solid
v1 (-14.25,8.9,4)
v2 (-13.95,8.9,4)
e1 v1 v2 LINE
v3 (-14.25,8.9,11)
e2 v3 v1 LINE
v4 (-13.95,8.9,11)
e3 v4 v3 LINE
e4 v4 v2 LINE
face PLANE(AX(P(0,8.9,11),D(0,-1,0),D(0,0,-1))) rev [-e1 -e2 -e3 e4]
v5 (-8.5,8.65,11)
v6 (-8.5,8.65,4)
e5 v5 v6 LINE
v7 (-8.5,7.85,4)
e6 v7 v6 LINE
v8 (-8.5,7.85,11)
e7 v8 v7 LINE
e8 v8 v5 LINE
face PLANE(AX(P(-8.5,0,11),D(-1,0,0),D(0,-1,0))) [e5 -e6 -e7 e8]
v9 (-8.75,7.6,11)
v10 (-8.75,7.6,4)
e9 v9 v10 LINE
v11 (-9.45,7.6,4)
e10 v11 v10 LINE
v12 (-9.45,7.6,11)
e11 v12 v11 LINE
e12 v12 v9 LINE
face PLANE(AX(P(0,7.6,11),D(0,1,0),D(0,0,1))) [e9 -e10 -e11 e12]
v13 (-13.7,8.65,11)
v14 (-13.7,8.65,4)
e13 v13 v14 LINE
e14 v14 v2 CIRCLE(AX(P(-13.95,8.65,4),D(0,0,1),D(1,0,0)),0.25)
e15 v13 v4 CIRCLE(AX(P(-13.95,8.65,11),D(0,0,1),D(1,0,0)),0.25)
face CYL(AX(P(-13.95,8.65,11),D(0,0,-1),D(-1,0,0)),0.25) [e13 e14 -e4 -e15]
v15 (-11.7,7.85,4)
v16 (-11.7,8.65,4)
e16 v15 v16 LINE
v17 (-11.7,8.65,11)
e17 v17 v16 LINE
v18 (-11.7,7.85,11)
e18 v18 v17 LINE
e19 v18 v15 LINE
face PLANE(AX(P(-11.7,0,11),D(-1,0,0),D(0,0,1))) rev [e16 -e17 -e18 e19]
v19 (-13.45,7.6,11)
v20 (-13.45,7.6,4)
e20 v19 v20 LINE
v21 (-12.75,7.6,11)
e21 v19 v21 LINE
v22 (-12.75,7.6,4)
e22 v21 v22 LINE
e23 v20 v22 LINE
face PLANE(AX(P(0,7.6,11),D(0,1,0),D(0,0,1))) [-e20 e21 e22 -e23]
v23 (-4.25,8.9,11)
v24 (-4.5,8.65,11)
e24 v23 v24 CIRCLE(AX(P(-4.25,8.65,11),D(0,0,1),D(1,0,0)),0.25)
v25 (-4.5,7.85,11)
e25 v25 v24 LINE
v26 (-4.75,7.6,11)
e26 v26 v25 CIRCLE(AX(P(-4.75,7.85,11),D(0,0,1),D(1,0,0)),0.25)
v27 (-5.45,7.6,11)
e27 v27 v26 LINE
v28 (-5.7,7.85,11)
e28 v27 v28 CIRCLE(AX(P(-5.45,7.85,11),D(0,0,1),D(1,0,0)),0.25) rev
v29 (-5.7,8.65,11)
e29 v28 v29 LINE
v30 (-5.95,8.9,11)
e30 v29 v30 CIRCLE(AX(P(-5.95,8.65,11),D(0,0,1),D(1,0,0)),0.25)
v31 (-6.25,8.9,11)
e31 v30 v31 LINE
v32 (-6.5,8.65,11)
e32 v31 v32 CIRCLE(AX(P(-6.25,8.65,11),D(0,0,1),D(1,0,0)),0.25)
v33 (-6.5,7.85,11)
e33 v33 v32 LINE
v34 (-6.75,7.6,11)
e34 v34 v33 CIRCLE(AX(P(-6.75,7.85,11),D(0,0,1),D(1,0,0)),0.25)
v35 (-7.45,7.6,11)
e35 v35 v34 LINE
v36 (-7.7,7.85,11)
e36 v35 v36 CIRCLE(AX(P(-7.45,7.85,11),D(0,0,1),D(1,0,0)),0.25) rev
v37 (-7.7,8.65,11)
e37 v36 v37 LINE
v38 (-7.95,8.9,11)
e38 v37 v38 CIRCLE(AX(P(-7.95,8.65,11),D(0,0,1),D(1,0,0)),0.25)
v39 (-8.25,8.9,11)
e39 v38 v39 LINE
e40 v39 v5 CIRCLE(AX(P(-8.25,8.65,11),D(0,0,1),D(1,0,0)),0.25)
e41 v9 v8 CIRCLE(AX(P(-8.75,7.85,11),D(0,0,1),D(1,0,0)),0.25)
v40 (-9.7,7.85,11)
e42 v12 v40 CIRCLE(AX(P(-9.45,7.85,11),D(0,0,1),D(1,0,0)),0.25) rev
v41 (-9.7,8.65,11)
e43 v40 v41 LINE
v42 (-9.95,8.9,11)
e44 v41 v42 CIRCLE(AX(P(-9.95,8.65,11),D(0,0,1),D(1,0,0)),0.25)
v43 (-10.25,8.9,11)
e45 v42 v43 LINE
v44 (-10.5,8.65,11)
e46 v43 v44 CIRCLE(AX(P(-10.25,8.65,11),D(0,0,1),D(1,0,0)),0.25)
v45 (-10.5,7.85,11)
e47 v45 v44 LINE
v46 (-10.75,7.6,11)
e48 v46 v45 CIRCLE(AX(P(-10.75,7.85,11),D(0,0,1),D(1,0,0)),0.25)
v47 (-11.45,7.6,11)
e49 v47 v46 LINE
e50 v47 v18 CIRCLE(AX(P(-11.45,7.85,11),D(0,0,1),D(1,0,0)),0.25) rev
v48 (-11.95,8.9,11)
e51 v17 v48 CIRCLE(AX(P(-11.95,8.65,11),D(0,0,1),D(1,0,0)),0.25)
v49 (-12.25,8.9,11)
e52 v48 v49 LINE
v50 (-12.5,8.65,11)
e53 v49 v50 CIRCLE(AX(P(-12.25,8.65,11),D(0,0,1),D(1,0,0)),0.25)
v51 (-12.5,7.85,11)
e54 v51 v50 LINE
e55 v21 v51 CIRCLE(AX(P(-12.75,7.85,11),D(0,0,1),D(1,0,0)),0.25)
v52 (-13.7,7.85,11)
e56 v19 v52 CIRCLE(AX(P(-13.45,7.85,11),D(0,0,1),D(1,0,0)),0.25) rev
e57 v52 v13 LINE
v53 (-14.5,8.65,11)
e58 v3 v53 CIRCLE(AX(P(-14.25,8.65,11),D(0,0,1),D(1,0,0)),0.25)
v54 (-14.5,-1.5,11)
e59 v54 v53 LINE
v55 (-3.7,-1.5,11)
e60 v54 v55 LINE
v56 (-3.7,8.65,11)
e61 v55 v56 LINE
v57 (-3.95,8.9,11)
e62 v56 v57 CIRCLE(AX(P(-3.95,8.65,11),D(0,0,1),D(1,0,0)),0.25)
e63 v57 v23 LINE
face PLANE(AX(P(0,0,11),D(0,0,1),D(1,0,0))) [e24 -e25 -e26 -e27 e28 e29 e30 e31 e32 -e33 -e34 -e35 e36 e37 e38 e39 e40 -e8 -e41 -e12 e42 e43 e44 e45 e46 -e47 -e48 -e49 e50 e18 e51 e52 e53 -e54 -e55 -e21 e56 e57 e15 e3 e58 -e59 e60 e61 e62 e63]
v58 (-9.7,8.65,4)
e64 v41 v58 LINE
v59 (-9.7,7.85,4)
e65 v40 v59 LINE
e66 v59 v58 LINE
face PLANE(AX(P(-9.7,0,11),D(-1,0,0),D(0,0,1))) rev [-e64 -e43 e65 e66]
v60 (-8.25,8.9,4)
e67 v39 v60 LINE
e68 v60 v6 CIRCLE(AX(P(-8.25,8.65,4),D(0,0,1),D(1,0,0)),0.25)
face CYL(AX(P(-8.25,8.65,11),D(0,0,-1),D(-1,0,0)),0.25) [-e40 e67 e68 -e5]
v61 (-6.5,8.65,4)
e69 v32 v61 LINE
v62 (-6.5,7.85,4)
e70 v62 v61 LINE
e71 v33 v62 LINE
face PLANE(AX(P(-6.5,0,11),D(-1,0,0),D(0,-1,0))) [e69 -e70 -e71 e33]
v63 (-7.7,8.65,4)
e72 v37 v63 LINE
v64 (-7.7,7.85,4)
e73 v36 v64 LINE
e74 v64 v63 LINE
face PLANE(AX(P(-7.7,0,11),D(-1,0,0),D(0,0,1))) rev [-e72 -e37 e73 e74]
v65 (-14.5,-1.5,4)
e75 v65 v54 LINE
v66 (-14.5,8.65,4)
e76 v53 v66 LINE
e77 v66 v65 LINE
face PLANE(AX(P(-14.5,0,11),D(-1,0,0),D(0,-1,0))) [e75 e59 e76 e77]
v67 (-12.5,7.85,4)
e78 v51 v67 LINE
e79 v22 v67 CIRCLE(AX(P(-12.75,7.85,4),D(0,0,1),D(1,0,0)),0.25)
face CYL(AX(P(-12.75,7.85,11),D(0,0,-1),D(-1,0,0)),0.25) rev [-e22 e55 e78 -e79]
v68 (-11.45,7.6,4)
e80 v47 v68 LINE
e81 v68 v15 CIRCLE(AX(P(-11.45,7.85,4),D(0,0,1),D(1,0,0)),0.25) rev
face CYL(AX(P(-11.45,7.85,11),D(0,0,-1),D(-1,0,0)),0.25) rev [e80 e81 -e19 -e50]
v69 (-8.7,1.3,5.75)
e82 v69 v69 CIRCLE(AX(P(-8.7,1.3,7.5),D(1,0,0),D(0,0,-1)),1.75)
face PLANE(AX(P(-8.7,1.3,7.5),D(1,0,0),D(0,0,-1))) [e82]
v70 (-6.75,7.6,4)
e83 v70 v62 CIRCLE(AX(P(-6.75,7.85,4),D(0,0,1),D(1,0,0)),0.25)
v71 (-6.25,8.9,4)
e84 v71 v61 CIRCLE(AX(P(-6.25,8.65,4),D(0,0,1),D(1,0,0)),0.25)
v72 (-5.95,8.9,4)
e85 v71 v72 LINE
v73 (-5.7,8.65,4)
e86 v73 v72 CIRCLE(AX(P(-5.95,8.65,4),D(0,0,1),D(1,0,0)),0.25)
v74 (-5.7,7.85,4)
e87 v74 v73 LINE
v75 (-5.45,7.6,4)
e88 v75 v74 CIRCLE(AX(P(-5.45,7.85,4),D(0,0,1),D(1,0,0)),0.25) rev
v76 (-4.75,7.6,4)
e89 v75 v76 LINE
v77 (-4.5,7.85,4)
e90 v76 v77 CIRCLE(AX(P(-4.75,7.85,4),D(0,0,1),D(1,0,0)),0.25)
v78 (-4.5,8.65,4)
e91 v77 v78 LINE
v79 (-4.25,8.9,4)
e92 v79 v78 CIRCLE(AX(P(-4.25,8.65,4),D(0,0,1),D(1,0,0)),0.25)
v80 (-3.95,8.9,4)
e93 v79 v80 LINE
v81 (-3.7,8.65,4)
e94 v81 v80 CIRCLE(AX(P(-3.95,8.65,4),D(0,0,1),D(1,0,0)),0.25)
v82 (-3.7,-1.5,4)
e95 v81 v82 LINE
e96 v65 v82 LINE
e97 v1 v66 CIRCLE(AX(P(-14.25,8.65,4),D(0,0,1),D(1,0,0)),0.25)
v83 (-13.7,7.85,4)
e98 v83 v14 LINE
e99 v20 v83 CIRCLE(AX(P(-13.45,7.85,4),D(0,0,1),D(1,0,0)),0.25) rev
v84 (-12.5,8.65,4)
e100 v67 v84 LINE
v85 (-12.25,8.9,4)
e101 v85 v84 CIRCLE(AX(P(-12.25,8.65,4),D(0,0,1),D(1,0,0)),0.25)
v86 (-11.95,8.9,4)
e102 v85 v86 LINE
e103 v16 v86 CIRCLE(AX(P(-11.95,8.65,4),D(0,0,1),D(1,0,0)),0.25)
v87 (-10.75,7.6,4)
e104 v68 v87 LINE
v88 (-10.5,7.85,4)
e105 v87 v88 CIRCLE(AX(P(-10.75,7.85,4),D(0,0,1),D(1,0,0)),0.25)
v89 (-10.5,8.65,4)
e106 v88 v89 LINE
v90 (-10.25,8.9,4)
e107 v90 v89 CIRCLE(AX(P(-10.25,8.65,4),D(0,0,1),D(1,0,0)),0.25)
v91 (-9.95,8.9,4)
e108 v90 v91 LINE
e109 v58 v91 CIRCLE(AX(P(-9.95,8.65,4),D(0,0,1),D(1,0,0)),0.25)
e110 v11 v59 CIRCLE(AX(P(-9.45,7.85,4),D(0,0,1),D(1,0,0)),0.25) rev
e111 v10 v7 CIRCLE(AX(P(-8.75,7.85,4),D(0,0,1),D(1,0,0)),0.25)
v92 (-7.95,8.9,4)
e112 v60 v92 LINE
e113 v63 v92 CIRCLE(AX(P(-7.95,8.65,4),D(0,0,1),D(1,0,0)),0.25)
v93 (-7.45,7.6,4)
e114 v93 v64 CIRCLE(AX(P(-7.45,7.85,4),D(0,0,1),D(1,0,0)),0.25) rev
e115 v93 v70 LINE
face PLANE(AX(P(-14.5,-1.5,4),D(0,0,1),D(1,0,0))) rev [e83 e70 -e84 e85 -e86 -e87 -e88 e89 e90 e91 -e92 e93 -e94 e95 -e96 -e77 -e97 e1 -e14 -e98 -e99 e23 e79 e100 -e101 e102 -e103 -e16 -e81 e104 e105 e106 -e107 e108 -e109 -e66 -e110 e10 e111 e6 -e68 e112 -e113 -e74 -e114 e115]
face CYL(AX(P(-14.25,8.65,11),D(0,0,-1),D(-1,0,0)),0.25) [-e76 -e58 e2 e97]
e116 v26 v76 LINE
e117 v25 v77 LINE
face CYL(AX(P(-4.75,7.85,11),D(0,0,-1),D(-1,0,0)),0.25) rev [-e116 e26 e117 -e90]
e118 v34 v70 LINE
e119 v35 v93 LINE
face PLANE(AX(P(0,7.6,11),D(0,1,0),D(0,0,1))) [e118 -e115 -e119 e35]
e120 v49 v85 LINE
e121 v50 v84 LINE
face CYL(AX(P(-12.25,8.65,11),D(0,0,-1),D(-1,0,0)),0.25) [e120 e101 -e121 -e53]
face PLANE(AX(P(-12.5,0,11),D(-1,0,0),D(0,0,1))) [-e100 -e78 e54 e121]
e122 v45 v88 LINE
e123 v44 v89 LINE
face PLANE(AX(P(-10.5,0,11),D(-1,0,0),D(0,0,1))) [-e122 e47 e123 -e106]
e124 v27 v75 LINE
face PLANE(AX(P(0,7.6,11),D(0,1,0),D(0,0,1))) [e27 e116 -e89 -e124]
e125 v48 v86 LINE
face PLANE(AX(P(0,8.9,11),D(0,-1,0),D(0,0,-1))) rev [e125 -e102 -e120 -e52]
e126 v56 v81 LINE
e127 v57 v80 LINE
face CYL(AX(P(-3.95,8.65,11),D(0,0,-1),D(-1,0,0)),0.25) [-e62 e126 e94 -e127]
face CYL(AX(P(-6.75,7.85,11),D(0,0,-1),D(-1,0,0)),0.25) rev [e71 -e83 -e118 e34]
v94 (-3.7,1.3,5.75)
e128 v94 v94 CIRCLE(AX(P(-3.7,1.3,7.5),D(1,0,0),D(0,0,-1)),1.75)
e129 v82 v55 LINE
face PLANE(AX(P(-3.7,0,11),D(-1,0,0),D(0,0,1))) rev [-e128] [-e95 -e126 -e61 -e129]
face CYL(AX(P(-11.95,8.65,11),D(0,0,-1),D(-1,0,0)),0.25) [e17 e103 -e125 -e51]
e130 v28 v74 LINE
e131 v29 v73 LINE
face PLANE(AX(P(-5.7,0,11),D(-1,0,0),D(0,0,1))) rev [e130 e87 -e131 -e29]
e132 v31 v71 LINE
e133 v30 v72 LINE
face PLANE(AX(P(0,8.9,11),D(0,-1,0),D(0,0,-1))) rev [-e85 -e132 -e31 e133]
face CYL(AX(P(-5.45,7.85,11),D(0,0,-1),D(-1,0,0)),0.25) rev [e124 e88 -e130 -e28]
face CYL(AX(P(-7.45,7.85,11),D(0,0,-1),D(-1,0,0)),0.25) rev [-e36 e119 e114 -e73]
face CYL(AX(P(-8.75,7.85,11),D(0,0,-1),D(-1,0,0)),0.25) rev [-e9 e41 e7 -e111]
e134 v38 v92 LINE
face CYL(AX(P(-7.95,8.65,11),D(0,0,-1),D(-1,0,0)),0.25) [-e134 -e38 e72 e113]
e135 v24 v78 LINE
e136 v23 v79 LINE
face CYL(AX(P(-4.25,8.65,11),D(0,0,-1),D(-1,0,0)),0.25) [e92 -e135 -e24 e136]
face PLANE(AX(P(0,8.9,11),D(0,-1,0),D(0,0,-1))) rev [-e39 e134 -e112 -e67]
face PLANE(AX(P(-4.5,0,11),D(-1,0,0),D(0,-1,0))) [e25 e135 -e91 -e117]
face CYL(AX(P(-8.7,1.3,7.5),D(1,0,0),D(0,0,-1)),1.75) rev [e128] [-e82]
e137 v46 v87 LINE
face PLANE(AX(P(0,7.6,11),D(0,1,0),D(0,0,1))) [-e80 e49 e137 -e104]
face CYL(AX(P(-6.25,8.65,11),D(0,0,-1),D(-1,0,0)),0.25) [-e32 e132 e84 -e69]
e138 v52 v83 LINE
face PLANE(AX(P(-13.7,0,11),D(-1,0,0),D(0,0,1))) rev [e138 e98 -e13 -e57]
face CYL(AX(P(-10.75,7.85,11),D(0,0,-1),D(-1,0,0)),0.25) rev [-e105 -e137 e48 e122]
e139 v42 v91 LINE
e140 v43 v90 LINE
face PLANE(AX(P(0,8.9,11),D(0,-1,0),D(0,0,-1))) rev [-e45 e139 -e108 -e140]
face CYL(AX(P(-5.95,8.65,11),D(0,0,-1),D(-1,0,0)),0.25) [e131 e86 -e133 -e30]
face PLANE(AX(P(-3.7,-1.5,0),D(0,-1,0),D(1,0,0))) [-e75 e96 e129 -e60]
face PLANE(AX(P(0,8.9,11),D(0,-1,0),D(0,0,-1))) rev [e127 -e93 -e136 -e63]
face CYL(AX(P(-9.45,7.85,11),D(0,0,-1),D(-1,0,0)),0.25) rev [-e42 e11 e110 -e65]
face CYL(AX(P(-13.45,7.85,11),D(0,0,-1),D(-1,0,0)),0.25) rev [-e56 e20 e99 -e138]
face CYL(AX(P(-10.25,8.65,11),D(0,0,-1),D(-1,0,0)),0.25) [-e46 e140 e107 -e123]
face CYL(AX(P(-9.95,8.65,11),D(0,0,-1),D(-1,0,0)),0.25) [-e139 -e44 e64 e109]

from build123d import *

# Parameters (mm, degrees)
SKETCH_1_W              = 4.5
SKETCH_1_H              = 2.5
SKETCH_1_H_2            = 2
EXTRUDE_1_DEPTH         = 4
EXTRUDE_3_DEPTH         = 26
EXTRUDE_3_DEPTH_BACK    = 26
EXTRUDE_START           = -14
EXTRUDE_4_DEPTH         = 28
EXTRUDE_START_2         = 24.3
EXTRUDE_5_DEPTH         = 1.7
EXTRUDE_START_3         = 12.3
EXTRUDE_6_DEPTH         = 1.7
SKETCH_3_R              = 2
EXTRUDE_7_DEPTH         = 7
FILLET_1_R              = 3
CUT_EXTRUDE_1_REACH     = 42.685
SKETCH_3_4_R            = 2
CUT_EXTRUDE_START       = -24.3
SKETCH_4_R              = 7.5
CUT_EXTRUDE_2_DEPTH     = 24.3
CUT_EXTRUDE_START_2     = -12.3
SKETCH_4_3_R            = 7.5
CUT_EXTRUDE_3_DEPTH     = 12.3
FILLET_2_R              = 3
SKETCH_5_W              = 4.5
SKETCH_5_H              = 1
CUT_EXTRUDE_5_DEPTH     = 52.439284598
CUT_EXTRUDE_START_3     = 18
CUT_EXTRUDE_6_OUTLINE_W = 4.5
CUT_EXTRUDE_6_OUTLINE_H = 1.8
CUT_EXTRUDE_6_DEPTH     = 18
FILLET_3_R              = 2
SKETCH_6_W              = 3
SKETCH_6_H              = 6
CUT_EXTRUDE_7_DEPTH     = 7
SKETCH_7_R              = 1.8
CUT_EXTRUDE_8_DEPTH     = 56.463952257
SKETCH_10_OUTSIDE_W     = 70.182
SKETCH_10_OUTSIDE_H     = 79.182
SKETCH_10_OUTSIDE_W_2   = 10.8
SKETCH_10_OUTSIDE_H_2   = 10.4
CUT_EXTRUDE_11_DEPTH    = 42.560197394
SKETCH_11_W             = 4
SKETCH_11_H             = 10.4
CUT_EXTRUDE_12_DEPTH    = 18.800280897
SKETCH_13_R             = 2
EXTRUDE_8_DEPTH         = 7
SKETCH_14_R             = 1.75
CUT_EXTRUDE_13_DEPTH    = 5


# Read off the part's stored shape, not the designer's step: 凸台-拉伸4, 切除-拉伸6
with BuildPart() as part:
    # 草图1 → 凸台-拉伸1 (new body)
    with BuildSketch(Plane.XY):
        Polygon((26, 30.5), (-26, 30.5), (-26, 12.5), (-26, -3), (-14, -3), (-14, -5.5), (-14, -30.5), (14, -30.5), (14, -5.5), (14, -3), (26, -3), (26, 12.5), align=None)
        with Locations((0, -24.75)):
            Rectangle(SKETCH_1_W, SKETCH_1_H, mode=Mode.SUBTRACT)
        with Locations((0, -4.25)):
            Rectangle(SKETCH_1_W, SKETCH_1_H, mode=Mode.SUBTRACT)
        with Locations((-12.25, 11.5)):
            Rectangle(SKETCH_1_W, SKETCH_1_H_2, mode=Mode.SUBTRACT)
        with Locations((12.25, 11.5)):
            Rectangle(SKETCH_1_W, SKETCH_1_H_2, mode=Mode.SUBTRACT)
    extrude(amount=EXTRUDE_1_DEPTH)

    # 草图2 → 凸台-拉伸3 (add, two sides: drawn at the far end of the back side and taken through both)
    with BuildSketch(Plane(origin=(0, 0, 0), x_dir=(0, 0, -1), z_dir=(1, 0, 0)).offset(-EXTRUDE_3_DEPTH_BACK)):
        with BuildLine():
            Line((0, 30.5), (-10, 30.5))
            ThreePointArc((-10, 30.5), (-1, 21.5), (-10, 12.5))
            Line((-10, 12.5), (0, 12.5))
            Line((0, 12.5), (0, 30.5))
        make_face()
        with BuildLine():
            Line((-10, 14), (-10, 12.5))
            ThreePointArc((-10, 12.5), (-1, 21.5), (-10, 30.5))
            Line((-10, 30.5), (-10, 29))
            ThreePointArc((-10, 29), (-2.5, 21.5), (-10, 14))
        make_face()
    extrude(amount=EXTRUDE_3_DEPTH + EXTRUDE_3_DEPTH_BACK)

    # 凸台-拉伸4 outline → 凸台-拉伸4 (add)
    with BuildSketch(Plane(origin=(0, 0, 0), x_dir=(0, 0, -1), z_dir=(1, 0, 0)).offset(EXTRUDE_START)):
        with BuildLine():
            ThreePointArc((-10, -7), (-6.645898034, -7.791796068), (-4, -10))
            Line((-4, -10), (-4, -5.5))
            Line((-4, -5.5), (-10, -5.5))
            Line((-10, -5.5), (-10, -7))
        make_face()
        with BuildLine():
            Line((-10, -23.5), (-4, -23.5))
            Line((-4, -23.5), (-4, -19))
            ThreePointArc((-4, -19), (-6.645898034, -21.208203932), (-10, -22))
            Line((-10, -22), (-10, -23.5))
        make_face()
    extrude(amount=EXTRUDE_4_DEPTH)

    # 草图2<5> → 凸台-拉伸5 (add)
    with BuildSketch(Plane(origin=(0, 0, 0), x_dir=(0, 0, -1), z_dir=(1, 0, 0)).offset(EXTRUDE_START_2)):
        with BuildLine():
            Line((-10, 16.5), (-10, 14))
            ThreePointArc((-10, 14), (-2.5, 21.5), (-10, 29))
            Line((-10, 29), (-10, 26.5))
            ThreePointArc((-10, 26.5), (-5, 21.5), (-10, 16.5))
        make_face()
    extrude_5 = extrude(amount=EXTRUDE_5_DEPTH)

    # 草图2<6> → 凸台-拉伸6 (add)
    with BuildSketch(Plane(origin=(0, 0, 0), x_dir=(0, 0, -1), z_dir=(1, 0, 0)).offset(EXTRUDE_START_3)):
        with BuildLine():
            Line((-10, -9.5), (-10, -7))
            ThreePointArc((-10, -7), (-2.5, -14.5), (-10, -22))
            Line((-10, -22), (-10, -19.5))
            ThreePointArc((-10, -19.5), (-5, -14.5), (-10, -9.5))
        make_face()
    extrude_6 = extrude(amount=EXTRUDE_6_DEPTH)

    # 镜向1: 凸台-拉伸5, 凸台-拉伸6 across plane
    add(extrude_5.mirror(Plane(origin=(0, 0, 0), x_dir=(0, 0, 1), z_dir=(1, 0, 0))))
    add(extrude_6.mirror(Plane(origin=(0, 0, 0), x_dir=(0, 0, 1), z_dir=(1, 0, 0))))

    # 草图3 → 凸台-拉伸7 (add)
    # profile 1 of 2: a face of its own
    with BuildSketch(Plane.XY.offset(4)):
        with BuildLine():
            Line((-14.5, 8.65), (-14.5, -3))
            Line((-14.5, -3), (26, -3))
            Line((26, -3), (26, 8.65))
            Line((26, 8.65), (15.5, 8.65))
            Line((15.5, 8.65), (15.5, 7.85))
            ThreePointArc((15.5, 7.85), (15.426776695, 7.673223305), (15.25, 7.6))
            Line((15.25, 7.6), (14.55, 7.6))
            ThreePointArc((14.55, 7.6), (14.373223305, 7.673223305), (14.3, 7.85))
            Line((14.3, 7.85), (14.3, 8.65))
            ThreePointArc((14.3, 8.65), (14.226776695, 8.826776695), (14.05, 8.9))
            Line((14.05, 8.9), (13.75, 8.9))
            ThreePointArc((13.75, 8.9), (13.573223305, 8.826776695), (13.5, 8.65))
            Line((13.5, 8.65), (13.5, 7.85))
            ThreePointArc((13.5, 7.85), (13.426776695, 7.673223305), (13.25, 7.6))
            Line((13.25, 7.6), (12.55, 7.6))
            ThreePointArc((12.55, 7.6), (12.373223305, 7.673223305), (12.3, 7.85))
            Line((12.3, 7.85), (12.3, 8.65))
            ThreePointArc((12.3, 8.65), (12.226776695, 8.826776695), (12.05, 8.9))
            Line((12.05, 8.9), (11.75, 8.9))
            ThreePointArc((11.75, 8.9), (11.573223305, 8.826776695), (11.5, 8.65))
            Line((11.5, 8.65), (11.5, 7.85))
            ThreePointArc((11.5, 7.85), (11.426776695, 7.673223305), (11.25, 7.6))
            Line((11.25, 7.6), (10.55, 7.6))
            ThreePointArc((10.55, 7.6), (10.373223305, 7.673223305), (10.3, 7.85))
            Line((10.3, 7.85), (10.3, 8.65))
            ThreePointArc((10.3, 8.65), (10.226776695, 8.826776695), (10.05, 8.9))
            Line((10.05, 8.9), (9.75, 8.9))
            ThreePointArc((9.75, 8.9), (9.573223305, 8.826776695), (9.5, 8.65))
            Line((9.5, 8.65), (9.5, 7.85))
            ThreePointArc((9.5, 7.85), (9.426776695, 7.673223305), (9.25, 7.6))
            Line((9.25, 7.6), (8.55, 7.6))
            ThreePointArc((8.55, 7.6), (8.373223305, 7.673223305), (8.3, 7.85))
            Line((8.3, 7.85), (8.3, 8.65))
            ThreePointArc((8.3, 8.65), (8.226776695, 8.826776695), (8.05, 8.9))
            Line((8.05, 8.9), (7.75, 8.9))
            ThreePointArc((7.75, 8.9), (7.573223305, 8.826776695), (7.5, 8.65))
            Line((7.5, 8.65), (7.5, 7.85))
            ThreePointArc((7.5, 7.85), (7.426776695, 7.673223305), (7.25, 7.6))
            Line((7.25, 7.6), (6.55, 7.6))
            ThreePointArc((6.55, 7.6), (6.373223305, 7.673223305), (6.3, 7.85))
            Line((6.3, 7.85), (6.3, 8.65))
            ThreePointArc((6.3, 8.65), (6.226776695, 8.826776695), (6.05, 8.9))
            Line((6.05, 8.9), (5.75, 8.9))
            ThreePointArc((5.75, 8.9), (5.573223305, 8.826776695), (5.5, 8.65))
            Line((5.5, 8.65), (5.5, 7.85))
            ThreePointArc((5.5, 7.85), (5.426776695, 7.673223305), (5.25, 7.6))
            Line((5.25, 7.6), (4.55, 7.6))
            ThreePointArc((4.55, 7.6), (4.373223305, 7.673223305), (4.3, 7.85))
            Line((4.3, 7.85), (4.3, 8.65))
            ThreePointArc((4.3, 8.65), (4.226776695, 8.826776695), (4.05, 8.9))
            Line((4.05, 8.9), (3.75, 8.9))
            ThreePointArc((3.75, 8.9), (3.573223305, 8.826776695), (3.5, 8.65))
            Line((3.5, 8.65), (3.5, 7.85))
            ThreePointArc((3.5, 7.85), (3.426776695, 7.673223305), (3.25, 7.6))
            Line((3.25, 7.6), (2.55, 7.6))
            ThreePointArc((2.55, 7.6), (2.373223305, 7.673223305), (2.3, 7.85))
            Line((2.3, 7.85), (2.3, 8.65))
            ThreePointArc((2.3, 8.65), (2.226776695, 8.826776695), (2.05, 8.9))
            Line((2.05, 8.9), (1.75, 8.9))
            ThreePointArc((1.75, 8.9), (1.573223305, 8.826776695), (1.5, 8.65))
            Line((1.5, 8.65), (1.5, 7.85))
            ThreePointArc((1.5, 7.85), (1.426776695, 7.673223305), (1.25, 7.6))
            Line((1.25, 7.6), (0.55, 7.6))
            ThreePointArc((0.55, 7.6), (0.373223305, 7.673223305), (0.3, 7.85))
            Line((0.3, 7.85), (0.3, 8.65))
            ThreePointArc((0.3, 8.65), (0.226776695, 8.826776695), (0.05, 8.9))
            Line((0.05, 8.9), (-0.25, 8.9))
            ThreePointArc((-0.25, 8.9), (-0.426776695, 8.826776695), (-0.5, 8.65))
            Line((-0.5, 8.65), (-0.5, 7.85))
            ThreePointArc((-0.5, 7.85), (-0.573223305, 7.673223305), (-0.75, 7.6))
            Line((-0.75, 7.6), (-1.45, 7.6))
            ThreePointArc((-1.45, 7.6), (-1.626776695, 7.673223305), (-1.7, 7.85))
            Line((-1.7, 7.85), (-1.7, 8.65))
            ThreePointArc((-1.7, 8.65), (-1.773223305, 8.826776695), (-1.95, 8.9))
            Line((-1.95, 8.9), (-2.25, 8.9))
            ThreePointArc((-2.25, 8.9), (-2.426776695, 8.826776695), (-2.5, 8.65))
            Line((-2.5, 8.65), (-2.5, 7.85))
            ThreePointArc((-2.5, 7.85), (-2.573223305, 7.673223305), (-2.75, 7.6))
            Line((-2.75, 7.6), (-3.45, 7.6))
            ThreePointArc((-3.45, 7.6), (-3.626776695, 7.673223305), (-3.7, 7.85))
            Line((-3.7, 7.85), (-3.7, 8.65))
            ThreePointArc((-3.7, 8.65), (-3.773223305, 8.826776695), (-3.95, 8.9))
            Line((-3.95, 8.9), (-4.25, 8.9))
            ThreePointArc((-4.25, 8.9), (-4.426776695, 8.826776695), (-4.5, 8.65))
            Line((-4.5, 8.65), (-4.5, 7.85))
            ThreePointArc((-4.5, 7.85), (-4.573223305, 7.673223305), (-4.75, 7.6))
            Line((-4.75, 7.6), (-5.45, 7.6))
            ThreePointArc((-5.45, 7.6), (-5.626776695, 7.673223305), (-5.7, 7.85))
            Line((-5.7, 7.85), (-5.7, 8.65))
            ThreePointArc((-5.7, 8.65), (-5.773223305, 8.826776695), (-5.95, 8.9))
            Line((-5.95, 8.9), (-6.25, 8.9))
            ThreePointArc((-6.25, 8.9), (-6.426776695, 8.826776695), (-6.5, 8.65))
            Line((-6.5, 8.65), (-6.5, 7.85))
            ThreePointArc((-6.5, 7.85), (-6.573223305, 7.673223305), (-6.75, 7.6))
            Line((-6.75, 7.6), (-7.45, 7.6))
            ThreePointArc((-7.45, 7.6), (-7.626776695, 7.673223305), (-7.7, 7.85))
            Line((-7.7, 7.85), (-7.7, 8.65))
            ThreePointArc((-7.7, 8.65), (-7.773223305, 8.826776695), (-7.95, 8.9))
            Line((-7.95, 8.9), (-8.25, 8.9))
            ThreePointArc((-8.25, 8.9), (-8.426776695, 8.826776695), (-8.5, 8.65))
            Line((-8.5, 8.65), (-8.5, 7.85))
            ThreePointArc((-8.5, 7.85), (-8.573223305, 7.673223305), (-8.75, 7.6))
            Line((-8.75, 7.6), (-9.45, 7.6))
            ThreePointArc((-9.45, 7.6), (-9.626776695, 7.673223305), (-9.7, 7.85))
            Line((-9.7, 7.85), (-9.7, 8.65))
            ThreePointArc((-9.7, 8.65), (-9.773223305, 8.826776695), (-9.95, 8.9))
            Line((-9.95, 8.9), (-10.25, 8.9))
            ThreePointArc((-10.25, 8.9), (-10.426776695, 8.826776695), (-10.5, 8.65))
            Line((-10.5, 8.65), (-10.5, 7.85))
            ThreePointArc((-10.5, 7.85), (-10.573223305, 7.673223305), (-10.75, 7.6))
            Line((-10.75, 7.6), (-11.45, 7.6))
            ThreePointArc((-11.45, 7.6), (-11.626776695, 7.673223305), (-11.7, 7.85))
            Line((-11.7, 7.85), (-11.7, 8.65))
            ThreePointArc((-11.7, 8.65), (-11.773223305, 8.826776695), (-11.95, 8.9))
            Line((-11.95, 8.9), (-12.25, 8.9))
            ThreePointArc((-12.25, 8.9), (-12.426776695, 8.826776695), (-12.5, 8.65))
            Line((-12.5, 8.65), (-12.5, 7.85))
            ThreePointArc((-12.5, 7.85), (-12.573223305, 7.673223305), (-12.75, 7.6))
            Line((-12.75, 7.6), (-13.45, 7.6))
            ThreePointArc((-13.45, 7.6), (-13.626776695, 7.673223305), (-13.7, 7.85))
            Line((-13.7, 7.85), (-13.7, 8.65))
            ThreePointArc((-13.7, 8.65), (-13.773223305, 8.826776695), (-13.95, 8.9))
            Line((-13.95, 8.9), (-14.25, 8.9))
            ThreePointArc((-14.25, 8.9), (-14.426776695, 8.826776695), (-14.5, 8.65))
        make_face()
        with Locations((-9.1, 3)):
            Circle(SKETCH_3_R, mode=Mode.SUBTRACT)
    # profile 2 of 2: a face of its own
    with BuildSketch(Plane.XY.offset(4)):
        Polygon((-14.5, 10.5), (-14.5, 9.8), (26, 9.8), (26, 12.5), (14.5, 12.5), (14.5, 10.5), (10, 10.5), (10, 12.5), (-10, 12.5), (-10, 10.5), align=None)
    extrude(amount=EXTRUDE_7_DEPTH)

    # 圆角1
    # the kernel refuses this fillet: 3 mm, written as the material it adds along each edge
    with BuildSketch(Plane(origin=(14, -3, 0), x_dir=(1.4808894851111503e-12, -1.0, 0), z_dir=(0, 0, 1))) as fillet_1_piece_1_section:
        with BuildLine():
            CenterArc((FILLET_1_R, FILLET_1_R), FILLET_1_R, 180, 90)
            Line((0, FILLET_1_R), (0, 0))
            Line((0, 0), (FILLET_1_R, 0))
        make_face()
    fillet_1_piece_1 = extrude(amount=4, mode=Mode.PRIVATE)
    fillet_1_piece_1 = split(fillet_1_piece_1, bisect_by=Plane(origin=(13.978029732, -5.5, 2), z_dir=(0, -1, 0)), keep=Keep.TOP, mode=Mode.PRIVATE)
    add(fillet_1_piece_1)
    with BuildSketch(Plane(origin=(14, -3, 0), x_dir=(1.4808894851111503e-12, -1.0, 0), z_dir=(0, 0, 1))) as fillet_1_piece_2_section:
        with BuildLine():
            CenterArc((FILLET_1_R, FILLET_1_R), FILLET_1_R, 180, 90)
            Line((0, FILLET_1_R), (0, 0))
            Line((0, 0), (FILLET_1_R, 0))
        make_face()
    fillet_1_piece_2 = extrude(amount=4, mode=Mode.PRIVATE)
    fillet_1_piece_2 = split(fillet_1_piece_2, bisect_by=Plane(origin=(14.690666213, -5.5, 2), z_dir=(0, 1, 0)), keep=Keep.TOP, mode=Mode.PRIVATE)
    add(fillet_1_piece_2)
    with BuildSketch(Plane(origin=(14, -3, 0), x_dir=(1.4808894851111503e-12, -1.0, 0), z_dir=(0, 0, 1))) as fillet_1_piece_3_section:
        with BuildLine():
            CenterArc((FILLET_1_R, FILLET_1_R), FILLET_1_R, 180, 90)
            Line((0, FILLET_1_R), (0, 0))
            Line((0, 0), (FILLET_1_R, 0))
        make_face()
    fillet_1_piece_3 = extrude(amount=11.5, mode=Mode.PRIVATE)
    fillet_1_piece_3 = split(fillet_1_piece_3, bisect_by=Plane(origin=(13.978029732, -5.726390424, 10), z_dir=(0, 0, -1)), keep=Keep.TOP, mode=Mode.PRIVATE)
    fillet_1_piece_3 = split(fillet_1_piece_3, bisect_by=Plane(origin=(13.978029732, -5.5, 7), z_dir=(0, -1, 0)), keep=Keep.TOP, mode=Mode.PRIVATE)
    fillet_1_piece_3 = split(fillet_1_piece_3, bisect_by=Plane(origin=(13.978029732, -5.726390424, 4), z_dir=(0, 0, 1)), keep=Keep.TOP, mode=Mode.PRIVATE)
    add(fillet_1_piece_3)
    with BuildSketch(Plane(origin=(-14, -3, 0), x_dir=(1.4305593746657148e-12, -1.0, 0), z_dir=(0, 0, 1))) as fillet_1_piece_4_section:
        with BuildLine():
            CenterArc((FILLET_1_R, -FILLET_1_R), FILLET_1_R, 90, 90)
            Line((0, -FILLET_1_R), (0, 0))
            Line((0, 0), (FILLET_1_R, 0))
        make_face()
    fillet_1_piece_4 = extrude(amount=4, mode=Mode.PRIVATE)
    fillet_1_piece_4 = split(fillet_1_piece_4, bisect_by=Plane(origin=(-13.978029732, -5.5, 2), z_dir=(0, -1, 0)), keep=Keep.TOP, mode=Mode.PRIVATE)
    add(fillet_1_piece_4)
    with BuildSketch(Plane(origin=(-14, -3, 0), x_dir=(1.4305593746657148e-12, -1.0, 0), z_dir=(0, 0, 1))) as fillet_1_piece_5_section:
        with BuildLine():
            CenterArc((FILLET_1_R, -FILLET_1_R), FILLET_1_R, 90, 90)
            Line((0, -FILLET_1_R), (0, 0))
            Line((0, 0), (FILLET_1_R, 0))
        make_face()
    fillet_1_piece_5 = extrude(amount=4, mode=Mode.PRIVATE)
    fillet_1_piece_5 = split(fillet_1_piece_5, bisect_by=Plane(origin=(-14.188378362, -5.5, 2), z_dir=(0, 1, 0)), keep=Keep.TOP, mode=Mode.PRIVATE)
    fillet_1_piece_5 = split(fillet_1_piece_5, bisect_by=Plane(origin=(-14.5, -3.973372494, 2), z_dir=(1, 0, 0)), keep=Keep.TOP, mode=Mode.PRIVATE)
    add(fillet_1_piece_5)
    with BuildSketch(Plane(origin=(-14, -3, 0), x_dir=(1.4305593746657148e-12, -1.0, 0), z_dir=(0, 0, 1))) as fillet_1_piece_6_section:
        with BuildLine():
            CenterArc((FILLET_1_R, -FILLET_1_R), FILLET_1_R, 90, 90)
            Line((0, -FILLET_1_R), (0, 0))
            Line((0, 0), (FILLET_1_R, 0))
        make_face()
    fillet_1_piece_6 = extrude(amount=11.5, mode=Mode.PRIVATE)
    fillet_1_piece_6 = split(fillet_1_piece_6, bisect_by=Plane(origin=(-13.978029732, -5.726390424, 10), z_dir=(0, 0, -1)), keep=Keep.TOP, mode=Mode.PRIVATE)
    fillet_1_piece_6 = split(fillet_1_piece_6, bisect_by=Plane(origin=(-13.978029732, -5.726390424, 4), z_dir=(0, 0, 1)), keep=Keep.TOP, mode=Mode.PRIVATE)
    fillet_1_piece_6 = split(fillet_1_piece_6, bisect_by=Plane(origin=(-13.978029732, -5.5, 7), z_dir=(0, -1, 0)), keep=Keep.TOP, mode=Mode.PRIVATE)
    add(fillet_1_piece_6)
    with BuildSketch(Plane(origin=(-14, -3, 0), x_dir=(1.4305593746657148e-12, -1.0, 0), z_dir=(0, 0, 1))) as fillet_1_piece_7_section:
        with BuildLine():
            CenterArc((FILLET_1_R, -FILLET_1_R), FILLET_1_R, 90, 90)
            Line((0, -FILLET_1_R), (0, 0))
            Line((0, 0), (FILLET_1_R, 0))
        make_face()
    fillet_1_piece_7 = extrude(amount=4, mode=Mode.PRIVATE)
    fillet_1_piece_7 = split(fillet_1_piece_7, bisect_by=Plane(origin=(-14.5, -3.326599677, 2), z_dir=(-1, 0, 0)), keep=Keep.TOP, mode=Mode.PRIVATE)
    add(fillet_1_piece_7)
    # the kernel refuses this fillet: 3 mm, written as the material it takes off along each edge
    with BuildSketch(Plane(origin=(14, -30.5, -7.5), x_dir=(0, 1, 0), z_dir=(0, 0, 1)), Plane(origin=(-14, -30.5, -7.5), x_dir=(1, 0, 0), z_dir=(0, 0, 1)), Plane(origin=(-26, -3, -7.5), x_dir=(1, 0, 0), z_dir=(0, 0, 1))) as fillet_1_2_piece_1:
        with BuildLine():
            CenterArc((FILLET_1_R, FILLET_1_R), FILLET_1_R, 180, 90)
            Line((0, FILLET_1_R), (0, 0))
            Line((0, 0), (FILLET_1_R, 0))
        make_face()
    extrude(amount=19, mode=Mode.SUBTRACT)
    with BuildSketch(Plane(origin=(26, -3, 18.5), x_dir=(-1, 0, 0), z_dir=(0, 0, -1))) as fillet_1_2_piece_2:
        with BuildLine():
            CenterArc((FILLET_1_R, FILLET_1_R), FILLET_1_R, 180, 90)
            Line((0, FILLET_1_R), (0, 0))
            Line((0, 0), (FILLET_1_R, 0))
        make_face()
    extrude(amount=26, mode=Mode.SUBTRACT)

    # 草图3<4> → 切除-拉伸1 (cut, up to next)
    with BuildSketch(Plane.XY.offset(4), mode=Mode.PRIVATE) as cut_extrude_1_sk1:
        with Locations((-8, -27)):
            Circle(SKETCH_3_4_R)
    cut_extrude_1_tool1 = extrude(cut_extrude_1_sk1.sketch, amount=-CUT_EXTRUDE_1_REACH, mode=Mode.PRIVATE) & part.part
    # 草图3<4> → 切除-拉伸1 (cut, up to next)
    with BuildSketch(Plane.XY.offset(4), mode=Mode.PRIVATE) as cut_extrude_1_sk2:
        with Locations((8, -27)):
            Circle(SKETCH_3_4_R)
    cut_extrude_1_tool2 = extrude(cut_extrude_1_sk2.sketch, amount=-CUT_EXTRUDE_1_REACH, mode=Mode.PRIVATE) & part.part
    # 草图3<4> → 切除-拉伸1 (cut, up to next)
    with BuildSketch(Plane.XY.offset(4), mode=Mode.PRIVATE) as cut_extrude_1_sk3:
        with Locations((-9.1, 3)):
            Circle(SKETCH_3_4_R)
    cut_extrude_1_tool3 = extrude(cut_extrude_1_sk3.sketch, amount=-CUT_EXTRUDE_1_REACH, mode=Mode.PRIVATE) & part.part
    add(cut_extrude_1_tool1.solids().sort_by_distance((-8, -27, 4))[0], mode=Mode.SUBTRACT)
    add(cut_extrude_1_tool2.solids().sort_by_distance((8, -27, 4))[0], mode=Mode.SUBTRACT)
    add(cut_extrude_1_tool3.solids().sort_by_distance((-9.1, 3, 4))[0], mode=Mode.SUBTRACT)

    # 草图4 → 切除-拉伸2 (cut)
    with BuildSketch(Plane(origin=(0, 0, 0), x_dir=(0, 0, -1), z_dir=(1, 0, 0)).offset(CUT_EXTRUDE_START)):
        with Locations((-10, 21.5)):
            Circle(SKETCH_4_R)
    cut_extrude_2 = extrude(amount=CUT_EXTRUDE_2_DEPTH, mode=Mode.SUBTRACT)

    # 草图4<3> → 切除-拉伸3 (cut)
    with BuildSketch(Plane(origin=(0, 0, 0), x_dir=(0, 0, -1), z_dir=(1, 0, 0)).offset(CUT_EXTRUDE_START_2)):
        with Locations((-10, -14.5)):
            Circle(SKETCH_4_3_R)
    cut_extrude_3 = extrude(amount=CUT_EXTRUDE_3_DEPTH, mode=Mode.SUBTRACT)

    # 镜向2: 切除-拉伸2, 切除-拉伸3 across plane
    add(cut_extrude_2.mirror(Plane(origin=(0, 0, 0), x_dir=(0, 0, 1), z_dir=(1, 0, 0))), mode=Mode.SUBTRACT)
    add(cut_extrude_3.mirror(Plane(origin=(0, 0, 0), x_dir=(0, 0, 1), z_dir=(1, 0, 0))), mode=Mode.SUBTRACT)

    # 圆角2
    fillet_2_edges = [part.edges().sort_by_distance(p)[0] for p in [
        (0, 30.5, 0),
    ]]
    fillet(fillet_2_edges, radius=FILLET_2_R)

    # 草图5 → 切除-拉伸5 (cut, through all)
    with BuildSketch(Plane.XZ.offset(-12.5)):
        with Locations((-12.25, 0.5)):
            Rectangle(SKETCH_5_W, SKETCH_5_H)
        with Locations((12.25, 0.5)):
            Rectangle(SKETCH_5_W, SKETCH_5_H)
    extrude(amount=-CUT_EXTRUDE_5_DEPTH, mode=Mode.SUBTRACT)

    # 切除-拉伸6 outline → 切除-拉伸6 (cut)
    with BuildSketch(Plane.XZ.offset(-12.5).offset(CUT_EXTRUDE_START_3)):
        with Locations((0, 0.9)):
            Rectangle(CUT_EXTRUDE_6_OUTLINE_W, CUT_EXTRUDE_6_OUTLINE_H)
    extrude(amount=CUT_EXTRUDE_6_DEPTH, mode=Mode.SUBTRACT)

    # 圆角3
    fillet_3_edges = [part.edges().sort_by_distance(p)[0] for p in [
        (-12.25, 12.5, 1),
        (12.25, 12.5, 1),
        (0, -23.5, 1.8),
        (0, -5.5, 1.8),
    ]]
    fillet(fillet_3_edges, radius=FILLET_3_R)

    # 草图6 → 切除-拉伸7 (cut)
    with BuildSketch(Plane.XY.offset(11)):
        Polygon((26, 5.5), (19, 5.5), (19, -1.5), (-3.7, -1.5), (-3.7, 9.8), (26, 9.8), align=None)
        with Locations((22.5, 1.5)):
            Rectangle(SKETCH_6_W, SKETCH_6_H)
    extrude(amount=-CUT_EXTRUDE_7_DEPTH, mode=Mode.SUBTRACT)

    # 草图7 → 切除-拉伸8 (cut, through all)
    with BuildSketch(Plane.ZY.offset(-19)):
        with Locations(Location((7.5, 1.5, 0), (0, 0, 303.557309762))):
            Circle(SKETCH_7_R)
    extrude(amount=-CUT_EXTRUDE_8_DEPTH, mode=Mode.SUBTRACT)

    # 草图10 outside → 切除-拉伸11 (cut, through all)
    with BuildSketch(Plane.XY.offset(11)):
        Rectangle(SKETCH_10_OUTSIDE_W, SKETCH_10_OUTSIDE_H)
        with Locations((-9.1, 3.7)):
            Rectangle(SKETCH_10_OUTSIDE_W_2, SKETCH_10_OUTSIDE_H_2, mode=Mode.SUBTRACT)
    extrude(amount=-CUT_EXTRUDE_11_DEPTH, mode=Mode.SUBTRACT)

    # 草图11 → 切除-拉伸12 (cut, through all)
    with BuildSketch(Plane(origin=(-3.7, 0, 0), x_dir=(0, 0, -1), z_dir=(1, 0, 0))):
        with Locations((-2, 3.7)):
            Rectangle(SKETCH_11_W, SKETCH_11_H)
    extrude(amount=-CUT_EXTRUDE_12_DEPTH, mode=Mode.SUBTRACT)

    # 草图13 → 凸台-拉伸8 (add)
    with BuildSketch(Plane(origin=(0, 0, 4), x_dir=(-1, 0, 0), z_dir=(0, 0, -1))):
        with Locations((9.1, 3)):
            Circle(SKETCH_13_R)
    extrude(amount=-EXTRUDE_8_DEPTH)

    # 草图14 → 切除-拉伸13 (cut)
    with BuildSketch(Plane(origin=(-3.7, 0, 0), x_dir=(0, 0, -1), z_dir=(1, 0, 0))):
        with Locations((-7.5, 1.3)):
            Circle(SKETCH_14_R)
    extrude(amount=-CUT_EXTRUDE_13_DEPTH, mode=Mode.SUBTRACT)


solid = part.part
